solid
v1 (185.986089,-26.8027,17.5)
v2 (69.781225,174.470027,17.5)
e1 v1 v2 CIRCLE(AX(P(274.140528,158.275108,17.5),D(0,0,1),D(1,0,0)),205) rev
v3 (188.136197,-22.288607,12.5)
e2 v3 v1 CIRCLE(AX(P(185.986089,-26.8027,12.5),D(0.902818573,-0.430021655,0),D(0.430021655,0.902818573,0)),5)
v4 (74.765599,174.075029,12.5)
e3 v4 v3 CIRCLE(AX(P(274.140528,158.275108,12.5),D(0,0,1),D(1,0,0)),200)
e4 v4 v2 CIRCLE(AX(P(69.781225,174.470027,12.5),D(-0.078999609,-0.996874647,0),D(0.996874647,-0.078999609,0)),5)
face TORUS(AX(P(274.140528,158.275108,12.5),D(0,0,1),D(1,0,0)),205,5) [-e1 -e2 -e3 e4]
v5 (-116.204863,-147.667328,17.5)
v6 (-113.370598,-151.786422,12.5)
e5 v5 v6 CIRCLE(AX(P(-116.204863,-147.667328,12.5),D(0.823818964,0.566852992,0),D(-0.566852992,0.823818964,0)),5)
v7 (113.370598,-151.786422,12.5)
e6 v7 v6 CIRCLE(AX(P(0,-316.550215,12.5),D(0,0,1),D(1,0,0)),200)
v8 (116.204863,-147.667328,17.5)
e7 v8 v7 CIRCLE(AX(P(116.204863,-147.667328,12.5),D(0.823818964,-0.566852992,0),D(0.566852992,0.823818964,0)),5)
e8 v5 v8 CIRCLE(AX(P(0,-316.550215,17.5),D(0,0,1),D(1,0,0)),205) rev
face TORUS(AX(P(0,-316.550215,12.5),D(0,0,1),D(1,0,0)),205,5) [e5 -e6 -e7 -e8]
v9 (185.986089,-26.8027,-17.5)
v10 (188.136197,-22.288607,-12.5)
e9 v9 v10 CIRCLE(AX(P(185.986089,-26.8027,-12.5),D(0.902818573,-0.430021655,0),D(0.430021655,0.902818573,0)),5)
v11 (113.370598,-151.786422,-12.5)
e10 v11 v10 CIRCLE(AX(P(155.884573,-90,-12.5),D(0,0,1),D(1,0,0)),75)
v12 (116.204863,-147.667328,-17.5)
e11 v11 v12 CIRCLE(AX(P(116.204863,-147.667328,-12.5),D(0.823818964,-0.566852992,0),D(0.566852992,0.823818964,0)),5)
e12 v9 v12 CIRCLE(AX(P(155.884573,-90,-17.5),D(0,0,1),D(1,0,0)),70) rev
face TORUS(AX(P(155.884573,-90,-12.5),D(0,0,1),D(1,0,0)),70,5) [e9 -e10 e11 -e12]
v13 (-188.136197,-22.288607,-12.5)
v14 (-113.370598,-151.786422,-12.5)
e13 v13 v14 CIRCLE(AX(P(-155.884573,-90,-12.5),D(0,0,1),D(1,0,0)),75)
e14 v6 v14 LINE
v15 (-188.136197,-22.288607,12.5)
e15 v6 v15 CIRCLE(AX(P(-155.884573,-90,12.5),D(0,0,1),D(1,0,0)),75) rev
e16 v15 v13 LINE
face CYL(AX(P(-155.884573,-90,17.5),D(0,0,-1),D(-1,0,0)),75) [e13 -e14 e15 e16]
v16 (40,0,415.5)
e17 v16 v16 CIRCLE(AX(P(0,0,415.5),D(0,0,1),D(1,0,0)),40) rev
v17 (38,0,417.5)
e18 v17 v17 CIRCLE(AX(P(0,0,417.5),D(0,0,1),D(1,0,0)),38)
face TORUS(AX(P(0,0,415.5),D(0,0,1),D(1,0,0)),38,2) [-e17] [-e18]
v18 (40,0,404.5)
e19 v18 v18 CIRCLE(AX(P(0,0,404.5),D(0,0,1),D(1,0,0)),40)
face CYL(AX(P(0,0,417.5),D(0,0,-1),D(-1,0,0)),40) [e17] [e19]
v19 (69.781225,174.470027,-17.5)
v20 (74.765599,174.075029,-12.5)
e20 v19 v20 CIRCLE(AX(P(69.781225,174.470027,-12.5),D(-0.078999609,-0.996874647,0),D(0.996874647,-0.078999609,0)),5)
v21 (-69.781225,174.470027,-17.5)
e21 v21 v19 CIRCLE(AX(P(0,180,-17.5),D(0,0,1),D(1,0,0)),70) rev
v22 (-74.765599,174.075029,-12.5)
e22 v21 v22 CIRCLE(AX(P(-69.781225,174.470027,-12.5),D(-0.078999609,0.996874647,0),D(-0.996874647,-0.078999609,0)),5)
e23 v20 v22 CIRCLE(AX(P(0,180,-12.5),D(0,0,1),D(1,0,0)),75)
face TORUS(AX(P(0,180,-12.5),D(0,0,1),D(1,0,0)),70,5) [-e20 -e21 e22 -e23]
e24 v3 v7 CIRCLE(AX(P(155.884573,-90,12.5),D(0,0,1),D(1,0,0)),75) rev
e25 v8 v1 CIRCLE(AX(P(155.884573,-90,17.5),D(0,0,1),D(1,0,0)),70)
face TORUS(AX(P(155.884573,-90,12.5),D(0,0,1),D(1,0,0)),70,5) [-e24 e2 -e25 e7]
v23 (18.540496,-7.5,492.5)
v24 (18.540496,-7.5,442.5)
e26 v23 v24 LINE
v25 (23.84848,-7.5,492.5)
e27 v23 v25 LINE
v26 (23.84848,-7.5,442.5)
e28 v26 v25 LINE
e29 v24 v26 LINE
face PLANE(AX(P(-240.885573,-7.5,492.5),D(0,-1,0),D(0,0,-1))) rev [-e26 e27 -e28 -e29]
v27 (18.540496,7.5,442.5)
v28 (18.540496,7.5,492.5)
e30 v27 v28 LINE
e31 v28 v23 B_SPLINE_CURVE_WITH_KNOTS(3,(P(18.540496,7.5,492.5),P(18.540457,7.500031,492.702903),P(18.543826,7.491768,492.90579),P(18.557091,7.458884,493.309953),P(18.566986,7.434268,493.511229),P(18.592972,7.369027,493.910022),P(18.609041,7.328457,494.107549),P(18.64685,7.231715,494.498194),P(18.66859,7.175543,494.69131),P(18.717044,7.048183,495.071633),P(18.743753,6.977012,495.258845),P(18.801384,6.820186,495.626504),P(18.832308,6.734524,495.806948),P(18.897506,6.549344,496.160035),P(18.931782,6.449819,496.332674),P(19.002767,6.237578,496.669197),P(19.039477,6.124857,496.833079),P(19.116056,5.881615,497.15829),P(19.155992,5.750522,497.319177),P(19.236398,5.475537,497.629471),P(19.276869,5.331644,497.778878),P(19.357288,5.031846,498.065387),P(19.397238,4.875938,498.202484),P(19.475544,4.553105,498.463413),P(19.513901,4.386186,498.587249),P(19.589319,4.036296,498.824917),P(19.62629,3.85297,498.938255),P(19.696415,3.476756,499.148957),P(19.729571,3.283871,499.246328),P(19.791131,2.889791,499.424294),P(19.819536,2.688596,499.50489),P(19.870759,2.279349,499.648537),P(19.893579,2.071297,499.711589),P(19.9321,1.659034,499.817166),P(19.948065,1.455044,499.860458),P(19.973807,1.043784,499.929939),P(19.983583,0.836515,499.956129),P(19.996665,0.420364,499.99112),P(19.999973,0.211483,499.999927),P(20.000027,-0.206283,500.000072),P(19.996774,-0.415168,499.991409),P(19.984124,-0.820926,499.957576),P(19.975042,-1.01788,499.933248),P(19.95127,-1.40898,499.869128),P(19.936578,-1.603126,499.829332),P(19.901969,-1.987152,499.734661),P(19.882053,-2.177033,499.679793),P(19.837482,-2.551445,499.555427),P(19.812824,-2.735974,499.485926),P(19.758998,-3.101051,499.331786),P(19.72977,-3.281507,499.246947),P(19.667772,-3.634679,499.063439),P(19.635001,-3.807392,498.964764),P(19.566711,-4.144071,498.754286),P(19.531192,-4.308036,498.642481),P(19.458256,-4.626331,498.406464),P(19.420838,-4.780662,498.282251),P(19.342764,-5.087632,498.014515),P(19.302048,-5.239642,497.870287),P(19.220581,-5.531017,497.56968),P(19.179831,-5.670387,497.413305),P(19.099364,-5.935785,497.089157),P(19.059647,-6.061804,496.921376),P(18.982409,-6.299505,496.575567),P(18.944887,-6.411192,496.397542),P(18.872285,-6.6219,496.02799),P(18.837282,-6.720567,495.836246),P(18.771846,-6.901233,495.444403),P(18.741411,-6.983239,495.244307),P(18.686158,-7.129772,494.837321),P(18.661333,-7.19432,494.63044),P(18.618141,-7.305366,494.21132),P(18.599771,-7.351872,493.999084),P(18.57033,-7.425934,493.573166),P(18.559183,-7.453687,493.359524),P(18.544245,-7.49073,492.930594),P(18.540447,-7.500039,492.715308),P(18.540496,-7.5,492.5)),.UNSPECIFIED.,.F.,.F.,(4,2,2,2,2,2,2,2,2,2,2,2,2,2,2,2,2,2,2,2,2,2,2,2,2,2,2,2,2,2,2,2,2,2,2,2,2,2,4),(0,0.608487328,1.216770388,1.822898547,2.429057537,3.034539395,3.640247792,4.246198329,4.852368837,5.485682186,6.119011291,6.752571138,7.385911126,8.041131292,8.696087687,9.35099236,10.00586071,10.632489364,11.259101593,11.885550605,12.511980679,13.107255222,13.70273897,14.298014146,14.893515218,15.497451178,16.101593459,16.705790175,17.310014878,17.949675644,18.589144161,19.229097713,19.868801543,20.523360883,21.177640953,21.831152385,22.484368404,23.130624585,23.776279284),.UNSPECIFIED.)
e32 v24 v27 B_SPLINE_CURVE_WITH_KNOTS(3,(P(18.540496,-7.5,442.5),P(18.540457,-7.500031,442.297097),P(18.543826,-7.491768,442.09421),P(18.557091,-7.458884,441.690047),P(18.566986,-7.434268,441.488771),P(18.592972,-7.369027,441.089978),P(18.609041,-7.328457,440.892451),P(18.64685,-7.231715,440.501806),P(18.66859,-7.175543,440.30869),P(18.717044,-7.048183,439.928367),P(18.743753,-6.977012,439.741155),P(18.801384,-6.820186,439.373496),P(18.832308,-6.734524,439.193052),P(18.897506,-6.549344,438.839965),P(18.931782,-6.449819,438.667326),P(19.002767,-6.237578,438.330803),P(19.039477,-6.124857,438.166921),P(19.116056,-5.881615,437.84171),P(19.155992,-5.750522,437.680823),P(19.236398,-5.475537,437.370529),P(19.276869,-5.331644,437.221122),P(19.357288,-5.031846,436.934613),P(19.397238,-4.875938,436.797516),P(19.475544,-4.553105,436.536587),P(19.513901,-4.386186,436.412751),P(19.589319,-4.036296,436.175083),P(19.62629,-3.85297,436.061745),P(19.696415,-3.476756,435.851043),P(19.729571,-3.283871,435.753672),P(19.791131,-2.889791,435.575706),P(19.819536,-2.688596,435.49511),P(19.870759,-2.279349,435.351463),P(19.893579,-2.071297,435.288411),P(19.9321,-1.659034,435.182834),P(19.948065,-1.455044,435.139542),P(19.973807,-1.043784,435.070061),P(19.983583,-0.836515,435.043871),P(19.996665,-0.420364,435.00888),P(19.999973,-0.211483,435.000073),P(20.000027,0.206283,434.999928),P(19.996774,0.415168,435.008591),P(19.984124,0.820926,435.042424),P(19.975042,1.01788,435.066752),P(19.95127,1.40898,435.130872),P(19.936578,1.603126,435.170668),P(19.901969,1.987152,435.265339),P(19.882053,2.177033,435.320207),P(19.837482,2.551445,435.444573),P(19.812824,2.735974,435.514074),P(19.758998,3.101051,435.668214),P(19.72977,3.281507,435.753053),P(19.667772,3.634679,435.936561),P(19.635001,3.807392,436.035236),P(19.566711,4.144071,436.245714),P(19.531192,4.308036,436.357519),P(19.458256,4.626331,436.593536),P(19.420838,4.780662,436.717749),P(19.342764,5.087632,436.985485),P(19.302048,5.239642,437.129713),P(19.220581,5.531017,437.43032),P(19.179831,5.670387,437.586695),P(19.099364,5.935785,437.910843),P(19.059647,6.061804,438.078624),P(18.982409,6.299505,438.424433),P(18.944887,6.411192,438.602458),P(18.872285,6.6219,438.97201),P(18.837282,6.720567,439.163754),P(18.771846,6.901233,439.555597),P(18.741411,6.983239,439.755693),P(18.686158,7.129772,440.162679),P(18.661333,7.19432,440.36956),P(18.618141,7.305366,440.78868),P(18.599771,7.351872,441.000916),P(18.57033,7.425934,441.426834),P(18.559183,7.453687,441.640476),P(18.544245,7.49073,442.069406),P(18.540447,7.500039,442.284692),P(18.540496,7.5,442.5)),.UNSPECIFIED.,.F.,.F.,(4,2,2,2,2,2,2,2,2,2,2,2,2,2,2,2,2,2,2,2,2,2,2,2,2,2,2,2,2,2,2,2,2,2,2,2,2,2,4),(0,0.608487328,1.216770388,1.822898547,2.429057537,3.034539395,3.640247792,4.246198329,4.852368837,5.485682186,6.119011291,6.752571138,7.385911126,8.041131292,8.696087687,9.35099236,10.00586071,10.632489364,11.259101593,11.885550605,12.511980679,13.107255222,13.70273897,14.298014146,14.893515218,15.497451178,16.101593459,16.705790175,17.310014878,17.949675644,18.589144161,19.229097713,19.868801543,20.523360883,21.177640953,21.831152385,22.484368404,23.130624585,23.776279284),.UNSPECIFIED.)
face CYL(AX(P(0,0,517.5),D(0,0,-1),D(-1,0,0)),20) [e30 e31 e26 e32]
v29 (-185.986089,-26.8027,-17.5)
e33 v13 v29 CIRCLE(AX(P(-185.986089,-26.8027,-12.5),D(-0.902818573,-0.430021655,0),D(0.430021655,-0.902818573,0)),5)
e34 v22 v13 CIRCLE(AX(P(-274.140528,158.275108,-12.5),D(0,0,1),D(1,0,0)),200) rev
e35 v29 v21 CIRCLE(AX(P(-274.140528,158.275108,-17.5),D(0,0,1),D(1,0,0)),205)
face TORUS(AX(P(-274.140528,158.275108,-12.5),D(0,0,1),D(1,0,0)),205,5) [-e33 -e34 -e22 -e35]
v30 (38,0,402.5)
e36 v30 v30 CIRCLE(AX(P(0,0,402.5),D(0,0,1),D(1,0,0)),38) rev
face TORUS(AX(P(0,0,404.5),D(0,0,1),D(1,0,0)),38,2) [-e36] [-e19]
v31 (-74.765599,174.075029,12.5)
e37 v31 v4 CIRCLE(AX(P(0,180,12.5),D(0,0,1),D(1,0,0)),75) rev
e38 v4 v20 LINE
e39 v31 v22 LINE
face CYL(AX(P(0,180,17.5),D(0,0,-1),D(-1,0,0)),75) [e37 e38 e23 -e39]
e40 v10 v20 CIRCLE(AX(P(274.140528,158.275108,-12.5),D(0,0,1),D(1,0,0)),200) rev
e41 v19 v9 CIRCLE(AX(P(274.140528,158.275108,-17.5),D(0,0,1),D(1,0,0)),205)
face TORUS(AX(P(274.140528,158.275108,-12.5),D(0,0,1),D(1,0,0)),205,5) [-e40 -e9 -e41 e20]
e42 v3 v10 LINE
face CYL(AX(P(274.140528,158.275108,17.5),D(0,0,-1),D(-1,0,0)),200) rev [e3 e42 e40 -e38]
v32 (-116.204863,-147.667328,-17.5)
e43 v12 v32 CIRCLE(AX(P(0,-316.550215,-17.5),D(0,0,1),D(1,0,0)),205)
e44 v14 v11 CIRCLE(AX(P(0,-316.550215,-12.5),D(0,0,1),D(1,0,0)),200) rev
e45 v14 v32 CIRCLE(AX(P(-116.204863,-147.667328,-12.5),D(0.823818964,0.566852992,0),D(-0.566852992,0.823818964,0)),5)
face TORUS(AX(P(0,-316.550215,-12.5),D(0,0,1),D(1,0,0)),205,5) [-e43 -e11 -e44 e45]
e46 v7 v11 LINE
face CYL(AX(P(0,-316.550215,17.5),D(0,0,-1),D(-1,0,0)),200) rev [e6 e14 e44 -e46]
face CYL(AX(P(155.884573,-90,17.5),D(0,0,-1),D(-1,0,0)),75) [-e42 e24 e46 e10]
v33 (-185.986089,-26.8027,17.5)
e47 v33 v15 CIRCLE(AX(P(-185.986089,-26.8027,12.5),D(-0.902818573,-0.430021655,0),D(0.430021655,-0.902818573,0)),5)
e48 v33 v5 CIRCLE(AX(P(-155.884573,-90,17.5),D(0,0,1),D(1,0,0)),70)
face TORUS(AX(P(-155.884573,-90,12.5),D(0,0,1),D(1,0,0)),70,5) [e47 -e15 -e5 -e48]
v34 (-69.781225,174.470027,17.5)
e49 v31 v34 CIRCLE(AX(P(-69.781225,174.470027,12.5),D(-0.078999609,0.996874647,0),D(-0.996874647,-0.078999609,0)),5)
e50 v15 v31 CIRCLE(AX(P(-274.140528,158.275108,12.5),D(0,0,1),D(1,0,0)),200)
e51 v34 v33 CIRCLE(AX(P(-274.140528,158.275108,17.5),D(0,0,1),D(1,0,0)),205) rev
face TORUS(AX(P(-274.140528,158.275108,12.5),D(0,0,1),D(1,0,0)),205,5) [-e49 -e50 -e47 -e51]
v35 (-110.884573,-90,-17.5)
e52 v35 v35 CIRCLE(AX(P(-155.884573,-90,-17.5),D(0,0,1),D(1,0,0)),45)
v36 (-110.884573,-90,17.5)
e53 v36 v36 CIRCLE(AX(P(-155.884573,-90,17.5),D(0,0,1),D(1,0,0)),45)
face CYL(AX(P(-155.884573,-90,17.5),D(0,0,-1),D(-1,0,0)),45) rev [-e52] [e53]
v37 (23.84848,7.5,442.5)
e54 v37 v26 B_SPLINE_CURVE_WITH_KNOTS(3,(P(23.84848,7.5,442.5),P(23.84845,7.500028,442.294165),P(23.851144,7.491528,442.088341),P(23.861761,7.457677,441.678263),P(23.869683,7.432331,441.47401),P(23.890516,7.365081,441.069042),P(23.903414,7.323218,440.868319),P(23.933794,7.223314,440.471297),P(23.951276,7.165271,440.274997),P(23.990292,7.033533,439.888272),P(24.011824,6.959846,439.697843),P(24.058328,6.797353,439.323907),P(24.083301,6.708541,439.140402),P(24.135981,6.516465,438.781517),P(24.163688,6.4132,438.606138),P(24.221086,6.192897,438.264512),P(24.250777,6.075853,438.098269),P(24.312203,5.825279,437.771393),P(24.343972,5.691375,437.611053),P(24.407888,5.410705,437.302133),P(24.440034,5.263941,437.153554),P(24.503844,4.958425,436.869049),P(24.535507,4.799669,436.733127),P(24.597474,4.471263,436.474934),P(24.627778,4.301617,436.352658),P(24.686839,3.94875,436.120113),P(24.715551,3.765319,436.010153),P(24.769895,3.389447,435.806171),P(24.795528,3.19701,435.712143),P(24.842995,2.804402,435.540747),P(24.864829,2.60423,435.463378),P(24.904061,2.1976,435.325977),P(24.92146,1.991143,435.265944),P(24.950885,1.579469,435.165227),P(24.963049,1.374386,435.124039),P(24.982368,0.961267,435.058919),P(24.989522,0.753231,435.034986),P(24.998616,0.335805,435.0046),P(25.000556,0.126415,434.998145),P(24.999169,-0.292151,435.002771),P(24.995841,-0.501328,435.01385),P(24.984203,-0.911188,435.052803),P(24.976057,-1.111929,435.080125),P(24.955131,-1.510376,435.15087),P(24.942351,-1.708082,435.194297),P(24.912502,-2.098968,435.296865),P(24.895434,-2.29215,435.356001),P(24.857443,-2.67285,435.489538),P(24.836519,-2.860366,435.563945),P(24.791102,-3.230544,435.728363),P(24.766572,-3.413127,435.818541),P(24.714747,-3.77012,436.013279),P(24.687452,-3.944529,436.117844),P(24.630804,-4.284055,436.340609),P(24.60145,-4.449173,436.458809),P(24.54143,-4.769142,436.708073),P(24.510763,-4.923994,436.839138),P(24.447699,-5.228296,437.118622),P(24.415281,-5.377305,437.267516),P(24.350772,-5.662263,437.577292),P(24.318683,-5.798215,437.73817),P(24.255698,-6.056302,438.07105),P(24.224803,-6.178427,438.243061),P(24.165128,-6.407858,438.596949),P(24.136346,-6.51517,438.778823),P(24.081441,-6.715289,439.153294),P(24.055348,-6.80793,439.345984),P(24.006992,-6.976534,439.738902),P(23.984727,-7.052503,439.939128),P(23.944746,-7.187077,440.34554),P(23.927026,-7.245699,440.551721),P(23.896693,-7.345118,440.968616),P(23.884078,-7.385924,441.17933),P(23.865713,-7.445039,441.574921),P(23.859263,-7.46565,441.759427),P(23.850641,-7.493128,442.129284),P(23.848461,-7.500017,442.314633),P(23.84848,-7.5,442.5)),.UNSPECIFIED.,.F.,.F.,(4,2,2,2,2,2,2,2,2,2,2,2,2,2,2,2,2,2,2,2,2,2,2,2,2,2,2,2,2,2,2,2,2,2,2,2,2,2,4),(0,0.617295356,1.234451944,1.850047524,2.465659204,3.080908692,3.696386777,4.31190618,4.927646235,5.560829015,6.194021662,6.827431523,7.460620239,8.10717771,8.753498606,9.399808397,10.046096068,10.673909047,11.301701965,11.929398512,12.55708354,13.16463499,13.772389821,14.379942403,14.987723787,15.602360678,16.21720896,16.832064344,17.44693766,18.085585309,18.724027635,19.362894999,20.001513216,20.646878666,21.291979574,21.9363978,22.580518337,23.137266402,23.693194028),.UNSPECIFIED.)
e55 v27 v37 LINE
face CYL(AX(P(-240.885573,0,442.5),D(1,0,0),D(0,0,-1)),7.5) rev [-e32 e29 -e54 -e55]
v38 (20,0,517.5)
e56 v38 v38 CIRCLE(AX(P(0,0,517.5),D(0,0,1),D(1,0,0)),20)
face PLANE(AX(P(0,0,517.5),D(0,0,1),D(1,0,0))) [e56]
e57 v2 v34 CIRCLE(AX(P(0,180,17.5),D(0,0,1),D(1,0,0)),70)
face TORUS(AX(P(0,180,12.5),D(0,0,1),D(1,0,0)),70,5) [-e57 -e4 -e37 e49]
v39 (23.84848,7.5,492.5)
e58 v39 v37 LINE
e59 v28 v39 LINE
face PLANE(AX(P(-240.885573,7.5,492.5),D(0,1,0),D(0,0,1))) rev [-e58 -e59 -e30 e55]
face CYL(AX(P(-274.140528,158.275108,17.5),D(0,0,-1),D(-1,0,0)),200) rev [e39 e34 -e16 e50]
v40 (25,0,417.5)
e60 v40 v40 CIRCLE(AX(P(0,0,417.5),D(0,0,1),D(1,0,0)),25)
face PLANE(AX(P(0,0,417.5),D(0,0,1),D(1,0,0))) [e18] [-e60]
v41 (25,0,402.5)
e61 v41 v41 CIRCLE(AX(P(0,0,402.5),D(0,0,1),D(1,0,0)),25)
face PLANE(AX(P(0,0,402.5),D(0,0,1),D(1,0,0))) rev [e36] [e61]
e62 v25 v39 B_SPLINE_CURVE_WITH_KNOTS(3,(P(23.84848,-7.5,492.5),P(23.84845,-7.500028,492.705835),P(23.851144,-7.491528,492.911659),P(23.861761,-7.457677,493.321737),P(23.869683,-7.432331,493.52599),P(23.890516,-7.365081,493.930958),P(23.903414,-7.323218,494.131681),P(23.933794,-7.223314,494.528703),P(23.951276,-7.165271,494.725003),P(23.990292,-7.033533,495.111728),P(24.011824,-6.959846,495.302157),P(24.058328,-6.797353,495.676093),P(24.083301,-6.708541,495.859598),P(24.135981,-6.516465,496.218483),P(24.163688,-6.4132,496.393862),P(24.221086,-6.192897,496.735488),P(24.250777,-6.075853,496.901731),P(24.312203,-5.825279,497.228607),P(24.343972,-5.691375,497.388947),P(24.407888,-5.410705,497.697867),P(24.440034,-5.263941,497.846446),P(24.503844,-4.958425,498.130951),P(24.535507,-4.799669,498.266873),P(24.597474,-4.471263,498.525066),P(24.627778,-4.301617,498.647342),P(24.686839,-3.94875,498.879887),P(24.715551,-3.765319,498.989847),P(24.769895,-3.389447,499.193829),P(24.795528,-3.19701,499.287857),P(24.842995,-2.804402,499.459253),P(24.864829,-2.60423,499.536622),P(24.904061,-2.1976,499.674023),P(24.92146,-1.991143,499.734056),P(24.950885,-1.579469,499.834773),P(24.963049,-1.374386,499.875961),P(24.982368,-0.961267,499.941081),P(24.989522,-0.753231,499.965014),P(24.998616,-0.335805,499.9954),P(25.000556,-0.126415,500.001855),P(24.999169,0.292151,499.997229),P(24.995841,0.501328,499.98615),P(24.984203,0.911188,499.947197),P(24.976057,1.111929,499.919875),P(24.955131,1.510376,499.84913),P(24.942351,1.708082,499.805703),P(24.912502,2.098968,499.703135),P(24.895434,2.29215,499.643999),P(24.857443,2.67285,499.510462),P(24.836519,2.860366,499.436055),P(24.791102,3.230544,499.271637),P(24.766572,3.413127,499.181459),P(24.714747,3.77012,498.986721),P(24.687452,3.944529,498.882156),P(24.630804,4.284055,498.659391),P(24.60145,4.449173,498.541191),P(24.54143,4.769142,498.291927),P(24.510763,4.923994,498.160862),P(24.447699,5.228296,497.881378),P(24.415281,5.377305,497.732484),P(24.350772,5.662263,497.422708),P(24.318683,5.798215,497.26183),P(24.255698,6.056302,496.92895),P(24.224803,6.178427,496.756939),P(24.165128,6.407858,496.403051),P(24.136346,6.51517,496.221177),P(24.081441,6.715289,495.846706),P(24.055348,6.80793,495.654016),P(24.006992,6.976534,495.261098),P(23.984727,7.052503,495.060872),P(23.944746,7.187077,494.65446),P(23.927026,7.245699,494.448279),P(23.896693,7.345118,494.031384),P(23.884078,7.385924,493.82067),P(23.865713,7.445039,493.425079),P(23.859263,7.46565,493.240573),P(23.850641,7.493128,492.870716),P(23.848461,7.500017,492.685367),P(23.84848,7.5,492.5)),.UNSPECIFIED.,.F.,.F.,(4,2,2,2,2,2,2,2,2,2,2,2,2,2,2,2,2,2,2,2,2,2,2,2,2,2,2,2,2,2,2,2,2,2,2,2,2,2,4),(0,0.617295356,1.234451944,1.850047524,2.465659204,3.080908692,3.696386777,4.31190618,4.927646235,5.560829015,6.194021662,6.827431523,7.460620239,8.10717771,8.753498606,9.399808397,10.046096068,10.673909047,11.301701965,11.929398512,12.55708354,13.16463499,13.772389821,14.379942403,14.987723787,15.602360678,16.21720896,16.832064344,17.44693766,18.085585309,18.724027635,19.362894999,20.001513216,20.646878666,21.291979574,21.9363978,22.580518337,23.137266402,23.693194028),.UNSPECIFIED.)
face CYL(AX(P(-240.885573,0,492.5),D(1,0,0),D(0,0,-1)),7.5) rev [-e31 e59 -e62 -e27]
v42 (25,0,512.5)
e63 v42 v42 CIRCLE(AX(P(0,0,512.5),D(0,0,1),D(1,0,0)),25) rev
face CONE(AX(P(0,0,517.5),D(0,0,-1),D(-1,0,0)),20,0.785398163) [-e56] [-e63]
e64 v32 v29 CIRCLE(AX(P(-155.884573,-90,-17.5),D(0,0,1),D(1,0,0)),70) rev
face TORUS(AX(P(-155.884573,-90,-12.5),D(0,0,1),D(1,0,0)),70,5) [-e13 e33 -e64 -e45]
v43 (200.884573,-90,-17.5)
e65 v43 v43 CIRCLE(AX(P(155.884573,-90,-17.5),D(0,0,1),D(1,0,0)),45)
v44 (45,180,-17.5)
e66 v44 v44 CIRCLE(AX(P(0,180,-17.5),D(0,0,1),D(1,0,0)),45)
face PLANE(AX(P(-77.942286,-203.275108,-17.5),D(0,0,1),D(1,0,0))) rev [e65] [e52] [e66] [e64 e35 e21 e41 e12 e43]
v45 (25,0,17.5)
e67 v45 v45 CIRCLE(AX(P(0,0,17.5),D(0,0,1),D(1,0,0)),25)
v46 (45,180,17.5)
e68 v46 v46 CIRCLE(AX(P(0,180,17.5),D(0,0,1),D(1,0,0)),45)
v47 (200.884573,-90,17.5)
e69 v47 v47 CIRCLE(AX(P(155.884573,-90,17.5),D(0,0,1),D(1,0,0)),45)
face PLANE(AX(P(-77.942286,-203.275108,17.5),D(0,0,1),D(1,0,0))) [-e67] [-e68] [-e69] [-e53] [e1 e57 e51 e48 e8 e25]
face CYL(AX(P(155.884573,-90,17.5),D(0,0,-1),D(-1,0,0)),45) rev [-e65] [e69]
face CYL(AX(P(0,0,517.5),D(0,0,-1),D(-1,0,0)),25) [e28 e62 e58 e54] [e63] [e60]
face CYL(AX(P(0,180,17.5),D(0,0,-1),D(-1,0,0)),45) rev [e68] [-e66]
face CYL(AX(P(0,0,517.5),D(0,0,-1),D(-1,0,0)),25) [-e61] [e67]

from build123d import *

# Parameters (mm, degrees)
SKETCH1_R            = 45
BOSS_EXTRUDE1_DEPTH  = 17.5
FILLET2_R            = 5
SKETCH5_R            = 25
BOSS_EXTRUDE2_DEPTH  = 500
BOSS_EXTRUDE5_START  = -115
SKETCH9_R            = 40
BOSS_EXTRUDE5_DEPTH  = 15
FILLET4_R            = 2
CUT_EXTRUDE1_START   = 20.000000098
CUT_EXTRUDE1_DEPTH   = 5.999999902
CUT_EXTRUDE1_START_2 = 18.540495647
CUT_EXTRUDE1_2_DEPTH = 1.459504451
CUT_EXTRUDE1_START_3 = 434
CUT_EXTRUDE1_3_DEPTH = 67
CHAMFER1_SIZE        = 5


with BuildPart() as part:
    # Sketch1 → Boss-Extrude1 (new, symmetric)
    with BuildSketch(Plane.XY):
        with BuildLine():
            ThreePointArc((74.765598524, 174.075029343), (0, 255), (-74.765598524, 174.075029343))
            ThreePointArc((-74.765598524, 174.075029343), (-100.935447166, 58.275107592), (-188.136196838, -22.28860702))
            ThreePointArc((-188.136196838, -22.28860702), (-220.836477965, -127.5), (-113.370598314, -151.786422323))
            ThreePointArc((-113.370598314, -151.786422323), (0, -116.550215184), (113.370598314, -151.786422323))
            ThreePointArc((113.370598314, -151.786422323), (220.836477965, -127.5), (188.136196838, -22.28860702))
            ThreePointArc((188.136196838, -22.28860702), (100.935447166, 58.275107592), (74.765598524, 174.075029343))
        make_face()
        with Locations((155.884572681, -90)):
            Circle(SKETCH1_R, mode=Mode.SUBTRACT)
        with Locations((0, 180)):
            Circle(SKETCH1_R, mode=Mode.SUBTRACT)
        with Locations((-155.884572681, -90)):
            Circle(SKETCH1_R, mode=Mode.SUBTRACT)
    extrude(amount=BOSS_EXTRUDE1_DEPTH, both=True)

    # Fillet2
    fillet2_edges = [part.edges().sort_by_distance(p)[0] for p in [
        (100.935447166, 58.275107592, 17.5),
        (0, 255, 17.5),
        (-100.935447166, 58.275107592, 17.5),
        (-220.836477965, -127.5, 17.5),
        (0, -116.550215184, 17.5),
        (-220.836477965, -127.5, -17.5),
        (-100.935447166, 58.275107592, -17.5),
        (0, 255, -17.5),
        (100.935447166, 58.275107592, -17.5),
        (220.836477965, -127.5, -17.5),
        (0, -116.550215184, -17.5),
        (220.836477965, -127.5, 17.5),
    ]]
    fillet(fillet2_edges, radius=FILLET2_R)

    # Sketch5 → Boss-Extrude2 (add)
    with BuildSketch(Plane.XY.offset(17.5)):
        Circle(SKETCH5_R)
    extrude(amount=BOSS_EXTRUDE2_DEPTH)

    # Sketch9 → Boss-Extrude5 (add)
    with BuildSketch(Plane.XY.offset(517.5).offset(BOSS_EXTRUDE5_START)):
        Circle(SKETCH9_R)
    extrude(amount=BOSS_EXTRUDE5_DEPTH)

    # Fillet4
    fillet4_edges = [part.edges().sort_by_distance(p)[0] for p in [
        (-40, 0, 402.5),
        (-40, 0, 417.5),
    ]]
    fillet(fillet4_edges, radius=FILLET4_R)

    # Cut-Extrude1: read off the stored shape, not the designer's step
    # Cut-Extrude1 outline → Cut-Extrude1 (cut)
    with BuildSketch(Plane(origin=(0, 0, 0), x_dir=(0, 0, -1), z_dir=(1, 0, 0)).offset(CUT_EXTRUDE1_START)):
        with BuildLine():
            ThreePointArc((-492.5, 7.5), (-500, 0), (-492.5, -7.5))
            Line((-492.5, -7.5), (-442.5, -7.5))
            ThreePointArc((-442.5, -7.5), (-435, 0), (-442.5, 7.5))
            Line((-442.5, 7.5), (-492.5, 7.5))
        make_face()
    extrude(amount=CUT_EXTRUDE1_DEPTH, mode=Mode.SUBTRACT)

    # Cut-Extrude1 2 outline → Cut-Extrude1 2 (cut)
    with BuildSketch(Plane.YZ.offset(CUT_EXTRUDE1_START_2)):
        with BuildLine():
            ThreePointArc((7.5, 492.5), (0, 500), (-7.5, 492.5))
            Line((-7.5, 492.5), (-7.5, 442.5))
            ThreePointArc((-7.5, 442.5), (0, 435), (7.5, 442.5))
            Line((7.5, 442.5), (7.5, 492.5))
        make_face()
    extrude(amount=CUT_EXTRUDE1_2_DEPTH, mode=Mode.SUBTRACT)

    # Cut-Extrude1 3 outline → Cut-Extrude1 3 (add)
    with BuildSketch(Plane.XY.offset(CUT_EXTRUDE1_START_3)):
        with BuildLine():
            ThreePointArc((18.54049136, -7.50001201), (20, 0), (18.54049136, 7.50001201))
            Line((18.54049136, 7.50001201), (18.54049136, -7.50001201))
        make_face()
    extrude(amount=CUT_EXTRUDE1_3_DEPTH)

    # Chamfer1
    chamfer1_edges = [part.edges().sort_by_distance(p)[0] for p in [
        (-25, 0, 517.5),
    ]]
    chamfer(chamfer1_edges, length=CHAMFER1_SIZE)


solid = part.part
